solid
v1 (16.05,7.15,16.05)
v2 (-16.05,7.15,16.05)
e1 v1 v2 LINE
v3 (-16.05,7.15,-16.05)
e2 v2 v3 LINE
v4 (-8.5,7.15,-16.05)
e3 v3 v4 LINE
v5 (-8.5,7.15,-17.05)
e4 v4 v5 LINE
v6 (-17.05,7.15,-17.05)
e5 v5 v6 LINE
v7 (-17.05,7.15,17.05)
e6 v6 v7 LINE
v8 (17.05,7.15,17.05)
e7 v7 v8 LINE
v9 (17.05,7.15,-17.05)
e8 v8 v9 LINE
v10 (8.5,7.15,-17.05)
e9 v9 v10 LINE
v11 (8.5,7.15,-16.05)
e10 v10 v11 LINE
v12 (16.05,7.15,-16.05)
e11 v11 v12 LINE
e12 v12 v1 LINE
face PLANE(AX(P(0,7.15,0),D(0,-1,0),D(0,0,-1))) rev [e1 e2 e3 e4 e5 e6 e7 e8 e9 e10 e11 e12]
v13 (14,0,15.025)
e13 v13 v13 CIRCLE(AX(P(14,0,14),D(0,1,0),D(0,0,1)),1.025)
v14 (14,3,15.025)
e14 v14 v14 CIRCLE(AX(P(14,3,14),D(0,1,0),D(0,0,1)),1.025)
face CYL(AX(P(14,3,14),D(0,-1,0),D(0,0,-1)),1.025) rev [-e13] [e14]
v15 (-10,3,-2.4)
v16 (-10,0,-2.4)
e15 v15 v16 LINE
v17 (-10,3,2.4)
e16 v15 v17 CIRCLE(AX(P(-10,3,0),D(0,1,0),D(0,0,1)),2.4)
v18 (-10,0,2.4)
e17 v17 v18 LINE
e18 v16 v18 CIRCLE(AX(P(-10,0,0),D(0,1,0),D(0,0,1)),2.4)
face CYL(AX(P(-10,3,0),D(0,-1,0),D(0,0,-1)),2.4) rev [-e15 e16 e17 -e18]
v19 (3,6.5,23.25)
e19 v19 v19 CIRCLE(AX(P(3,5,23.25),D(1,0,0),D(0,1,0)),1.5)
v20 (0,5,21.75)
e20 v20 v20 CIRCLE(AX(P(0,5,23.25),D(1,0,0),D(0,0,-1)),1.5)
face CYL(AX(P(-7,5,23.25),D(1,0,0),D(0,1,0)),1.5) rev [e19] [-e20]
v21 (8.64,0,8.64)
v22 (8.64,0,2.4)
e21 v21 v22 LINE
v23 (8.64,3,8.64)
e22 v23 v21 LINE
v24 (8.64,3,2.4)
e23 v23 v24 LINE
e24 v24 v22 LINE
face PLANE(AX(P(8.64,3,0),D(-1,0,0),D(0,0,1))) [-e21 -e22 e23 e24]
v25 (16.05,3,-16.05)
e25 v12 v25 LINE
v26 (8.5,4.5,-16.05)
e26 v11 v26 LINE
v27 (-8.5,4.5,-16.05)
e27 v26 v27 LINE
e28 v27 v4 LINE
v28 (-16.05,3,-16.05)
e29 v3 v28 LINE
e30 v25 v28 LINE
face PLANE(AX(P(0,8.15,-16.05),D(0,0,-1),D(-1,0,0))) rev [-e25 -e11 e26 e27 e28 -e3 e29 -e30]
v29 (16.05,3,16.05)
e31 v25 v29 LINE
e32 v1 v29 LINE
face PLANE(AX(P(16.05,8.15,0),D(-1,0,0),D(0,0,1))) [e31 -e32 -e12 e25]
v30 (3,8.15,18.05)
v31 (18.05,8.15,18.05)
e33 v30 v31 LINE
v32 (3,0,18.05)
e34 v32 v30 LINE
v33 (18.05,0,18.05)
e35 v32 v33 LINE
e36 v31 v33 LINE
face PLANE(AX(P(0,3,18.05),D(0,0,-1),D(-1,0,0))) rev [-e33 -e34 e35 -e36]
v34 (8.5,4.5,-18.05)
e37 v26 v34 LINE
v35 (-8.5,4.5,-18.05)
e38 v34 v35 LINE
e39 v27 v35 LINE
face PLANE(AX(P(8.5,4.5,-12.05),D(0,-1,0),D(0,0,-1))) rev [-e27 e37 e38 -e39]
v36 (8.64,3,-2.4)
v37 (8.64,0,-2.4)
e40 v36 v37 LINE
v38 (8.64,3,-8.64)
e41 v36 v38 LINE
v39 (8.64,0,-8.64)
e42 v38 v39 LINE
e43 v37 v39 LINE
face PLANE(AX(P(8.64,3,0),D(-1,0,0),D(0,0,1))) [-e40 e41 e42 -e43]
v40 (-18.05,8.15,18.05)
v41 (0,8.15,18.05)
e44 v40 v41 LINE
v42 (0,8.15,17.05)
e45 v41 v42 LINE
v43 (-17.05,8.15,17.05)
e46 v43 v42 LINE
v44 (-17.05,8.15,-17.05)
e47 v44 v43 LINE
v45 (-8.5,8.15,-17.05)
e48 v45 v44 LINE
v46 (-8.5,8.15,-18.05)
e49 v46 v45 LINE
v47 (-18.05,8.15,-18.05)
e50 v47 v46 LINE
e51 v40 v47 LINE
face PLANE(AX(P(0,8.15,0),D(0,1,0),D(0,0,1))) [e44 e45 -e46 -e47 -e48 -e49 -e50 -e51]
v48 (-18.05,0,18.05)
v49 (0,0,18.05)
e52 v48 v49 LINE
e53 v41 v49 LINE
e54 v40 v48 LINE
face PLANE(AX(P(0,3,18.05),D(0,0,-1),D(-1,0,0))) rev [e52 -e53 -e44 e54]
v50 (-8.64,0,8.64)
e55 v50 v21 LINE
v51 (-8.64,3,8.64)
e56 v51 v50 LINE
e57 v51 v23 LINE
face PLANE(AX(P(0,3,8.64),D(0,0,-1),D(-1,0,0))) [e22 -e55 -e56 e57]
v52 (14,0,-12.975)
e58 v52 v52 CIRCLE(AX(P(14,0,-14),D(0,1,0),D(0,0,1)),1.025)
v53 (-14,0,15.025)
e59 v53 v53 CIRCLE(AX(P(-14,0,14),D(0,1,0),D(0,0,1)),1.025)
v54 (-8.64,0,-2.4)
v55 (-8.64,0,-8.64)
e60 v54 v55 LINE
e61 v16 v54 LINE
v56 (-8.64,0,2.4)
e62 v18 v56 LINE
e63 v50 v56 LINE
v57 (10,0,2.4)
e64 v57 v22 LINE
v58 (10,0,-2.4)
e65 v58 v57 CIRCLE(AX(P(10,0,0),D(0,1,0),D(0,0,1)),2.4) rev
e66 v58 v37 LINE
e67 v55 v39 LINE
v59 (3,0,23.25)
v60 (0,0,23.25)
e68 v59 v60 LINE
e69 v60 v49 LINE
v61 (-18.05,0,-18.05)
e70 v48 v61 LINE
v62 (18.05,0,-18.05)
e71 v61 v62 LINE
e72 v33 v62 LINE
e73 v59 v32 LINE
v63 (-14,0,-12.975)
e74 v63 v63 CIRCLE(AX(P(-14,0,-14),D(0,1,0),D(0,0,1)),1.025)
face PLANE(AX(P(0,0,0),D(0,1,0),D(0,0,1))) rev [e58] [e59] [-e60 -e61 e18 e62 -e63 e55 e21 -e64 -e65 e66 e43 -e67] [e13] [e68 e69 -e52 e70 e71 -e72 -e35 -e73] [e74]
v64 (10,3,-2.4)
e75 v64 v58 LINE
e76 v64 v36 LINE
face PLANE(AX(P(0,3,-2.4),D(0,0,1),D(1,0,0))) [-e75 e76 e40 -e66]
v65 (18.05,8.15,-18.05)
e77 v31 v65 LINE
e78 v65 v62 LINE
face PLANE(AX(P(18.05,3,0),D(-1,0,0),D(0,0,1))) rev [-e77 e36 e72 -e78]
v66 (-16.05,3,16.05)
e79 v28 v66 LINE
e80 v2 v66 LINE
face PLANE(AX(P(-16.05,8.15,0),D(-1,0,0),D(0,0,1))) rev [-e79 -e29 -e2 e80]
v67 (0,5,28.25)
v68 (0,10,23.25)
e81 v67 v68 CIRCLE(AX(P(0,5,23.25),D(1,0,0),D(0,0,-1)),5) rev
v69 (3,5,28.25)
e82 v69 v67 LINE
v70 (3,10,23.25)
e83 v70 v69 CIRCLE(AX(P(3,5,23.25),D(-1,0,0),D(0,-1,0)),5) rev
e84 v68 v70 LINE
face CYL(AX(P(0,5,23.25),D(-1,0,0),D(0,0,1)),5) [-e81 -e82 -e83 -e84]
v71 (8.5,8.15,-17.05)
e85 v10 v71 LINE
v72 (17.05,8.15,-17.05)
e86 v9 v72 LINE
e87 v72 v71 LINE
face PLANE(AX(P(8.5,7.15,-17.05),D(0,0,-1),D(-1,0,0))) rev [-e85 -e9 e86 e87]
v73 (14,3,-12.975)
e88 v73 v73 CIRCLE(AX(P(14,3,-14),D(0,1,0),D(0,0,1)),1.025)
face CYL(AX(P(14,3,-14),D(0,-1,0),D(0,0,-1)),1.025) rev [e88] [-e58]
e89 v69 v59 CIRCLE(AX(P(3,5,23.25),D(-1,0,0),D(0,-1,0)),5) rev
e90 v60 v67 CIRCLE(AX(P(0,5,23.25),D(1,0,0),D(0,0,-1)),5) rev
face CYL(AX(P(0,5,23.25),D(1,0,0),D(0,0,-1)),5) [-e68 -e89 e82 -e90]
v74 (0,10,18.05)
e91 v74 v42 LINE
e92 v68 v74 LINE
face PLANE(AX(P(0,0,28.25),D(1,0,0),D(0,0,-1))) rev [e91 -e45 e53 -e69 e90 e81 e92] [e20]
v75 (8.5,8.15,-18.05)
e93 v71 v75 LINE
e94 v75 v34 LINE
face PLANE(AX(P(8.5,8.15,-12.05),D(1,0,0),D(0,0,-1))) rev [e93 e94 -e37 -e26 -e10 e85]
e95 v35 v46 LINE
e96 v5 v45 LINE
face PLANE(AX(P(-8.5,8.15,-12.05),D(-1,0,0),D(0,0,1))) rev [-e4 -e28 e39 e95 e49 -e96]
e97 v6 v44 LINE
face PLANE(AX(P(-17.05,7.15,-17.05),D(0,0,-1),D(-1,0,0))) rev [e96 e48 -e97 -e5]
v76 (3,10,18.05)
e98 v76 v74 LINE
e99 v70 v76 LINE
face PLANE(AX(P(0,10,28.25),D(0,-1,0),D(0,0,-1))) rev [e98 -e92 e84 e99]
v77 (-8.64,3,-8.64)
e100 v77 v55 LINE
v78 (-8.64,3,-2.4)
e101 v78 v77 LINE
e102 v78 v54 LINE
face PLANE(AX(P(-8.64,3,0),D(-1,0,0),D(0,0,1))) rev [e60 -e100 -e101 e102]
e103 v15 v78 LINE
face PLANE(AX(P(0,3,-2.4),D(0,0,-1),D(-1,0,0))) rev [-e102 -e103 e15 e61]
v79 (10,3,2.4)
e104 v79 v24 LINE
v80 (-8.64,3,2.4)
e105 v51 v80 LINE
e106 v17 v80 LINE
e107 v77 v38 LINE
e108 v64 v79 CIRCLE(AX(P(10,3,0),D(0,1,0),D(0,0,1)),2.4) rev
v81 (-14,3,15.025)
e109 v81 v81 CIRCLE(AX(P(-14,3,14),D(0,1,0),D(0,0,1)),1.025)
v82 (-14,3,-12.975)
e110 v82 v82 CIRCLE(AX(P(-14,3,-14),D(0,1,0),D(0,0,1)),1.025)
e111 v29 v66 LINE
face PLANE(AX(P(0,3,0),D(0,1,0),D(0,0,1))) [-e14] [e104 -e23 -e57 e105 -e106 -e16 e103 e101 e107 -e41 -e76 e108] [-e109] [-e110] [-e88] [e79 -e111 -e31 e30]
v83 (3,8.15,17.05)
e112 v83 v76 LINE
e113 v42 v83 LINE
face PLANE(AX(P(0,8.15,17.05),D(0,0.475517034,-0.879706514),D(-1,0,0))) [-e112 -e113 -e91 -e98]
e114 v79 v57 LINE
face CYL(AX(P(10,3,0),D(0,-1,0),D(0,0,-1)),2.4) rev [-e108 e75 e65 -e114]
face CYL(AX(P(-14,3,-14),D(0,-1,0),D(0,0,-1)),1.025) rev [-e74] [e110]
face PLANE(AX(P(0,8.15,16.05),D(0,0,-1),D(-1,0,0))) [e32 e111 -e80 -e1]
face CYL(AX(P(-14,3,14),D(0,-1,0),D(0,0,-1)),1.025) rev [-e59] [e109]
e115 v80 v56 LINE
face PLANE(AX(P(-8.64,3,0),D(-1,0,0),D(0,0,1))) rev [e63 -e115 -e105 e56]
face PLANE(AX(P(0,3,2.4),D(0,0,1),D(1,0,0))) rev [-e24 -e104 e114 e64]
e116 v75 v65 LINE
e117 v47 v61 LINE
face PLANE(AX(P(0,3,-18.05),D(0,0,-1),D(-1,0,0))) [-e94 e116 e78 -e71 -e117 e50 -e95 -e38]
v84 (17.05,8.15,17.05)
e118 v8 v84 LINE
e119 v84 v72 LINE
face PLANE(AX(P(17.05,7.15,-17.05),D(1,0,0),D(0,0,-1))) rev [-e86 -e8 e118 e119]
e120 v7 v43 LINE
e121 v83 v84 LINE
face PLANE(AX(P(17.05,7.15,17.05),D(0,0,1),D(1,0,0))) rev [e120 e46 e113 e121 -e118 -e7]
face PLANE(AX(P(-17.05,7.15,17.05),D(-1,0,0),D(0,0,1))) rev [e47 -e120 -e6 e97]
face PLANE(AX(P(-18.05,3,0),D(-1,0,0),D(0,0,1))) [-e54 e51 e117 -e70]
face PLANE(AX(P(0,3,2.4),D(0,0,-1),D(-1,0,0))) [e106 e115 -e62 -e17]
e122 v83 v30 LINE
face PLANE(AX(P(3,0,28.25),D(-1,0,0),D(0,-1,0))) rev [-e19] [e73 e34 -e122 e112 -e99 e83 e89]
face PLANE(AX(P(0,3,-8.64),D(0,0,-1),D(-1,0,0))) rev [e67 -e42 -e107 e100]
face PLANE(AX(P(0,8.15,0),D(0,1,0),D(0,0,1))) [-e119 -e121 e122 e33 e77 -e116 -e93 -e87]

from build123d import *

# Parameters (mm, degrees)
SKETCH1_W           = 36.1
SKETCH1_H           = 36.1
SKETCH1_R           = 1.025
BOSS_EXTRUDE1_DEPTH = 3
SKETCH1_3_W         = 36.1
SKETCH1_3_H         = 36.1
SKETCH1_3_W_2       = 32.1
SKETCH1_3_H_2       = 32.1
BOSS_EXTRUDE2_DEPTH = 8.15
SKETCH2_W           = 17
SKETCH2_H           = 3.65
CUT_EXTRUDE1_DEPTH  = 6
CUT_EXTRUDE2_DEPTH  = 1
SKETCH6_W           = 3
SKETCH6_H           = 10
BOSS_EXTRUDE3_DEPTH = 10.2
FILLET1_R           = 5
SKETCH7_R           = 1.5
CUT_EXTRUDE3_DEPTH  = 10
CHAMFER1_SIZE2      = 1
CHAMFER1_SIZE       = 1.85


with BuildPart() as part:
    # Sketch1 → Boss-Extrude1 (new body)
    with BuildSketch(Plane(origin=(0, 0, 0), x_dir=(1, 0, 0), z_dir=(0, 1, 0))):
        Rectangle(SKETCH1_W, SKETCH1_H)
        with Locations(Location((-14, 14, 0), (0, 0, 270))):
            Circle(SKETCH1_R, mode=Mode.SUBTRACT)
        with Locations(Location((14, 14, 0), (0, 0, 270))):
            Circle(SKETCH1_R, mode=Mode.SUBTRACT)
        with Locations(Location((14, -14, 0), (0, 0, 270))):
            Circle(SKETCH1_R, mode=Mode.SUBTRACT)
        with Locations(Location((-14, -14, 0), (0, 0, 270))):
            Circle(SKETCH1_R, mode=Mode.SUBTRACT)
        with BuildLine():
            Line((-8.64, 2.4), (-8.64, 8.64))
            Line((-8.64, 8.64), (8.64, 8.64))
            Line((8.64, 8.64), (8.64, 2.4))
            Line((8.64, 2.4), (10, 2.4))
            ThreePointArc((10, 2.4), (12.4, 0), (10, -2.4))
            Line((10, -2.4), (8.64, -2.4))
            Line((8.64, -2.4), (8.64, -8.64))
            Line((8.64, -8.64), (-8.64, -8.64))
            Line((-8.64, -8.64), (-8.64, -2.4))
            Line((-8.64, -2.4), (-10, -2.4))
            ThreePointArc((-10, -2.4), (-12.4, 0), (-10, 2.4))
            Line((-10, 2.4), (-8.64, 2.4))
        make_face(mode=Mode.SUBTRACT)
    extrude(amount=BOSS_EXTRUDE1_DEPTH)

    # Sketch1<3> → Boss-Extrude2 (add)
    with BuildSketch(Plane(origin=(0, 0, 0), x_dir=(1, 0, 0), z_dir=(0, 1, 0))):
        Rectangle(SKETCH1_3_W, SKETCH1_3_H)
        Rectangle(SKETCH1_3_W_2, SKETCH1_3_H_2, mode=Mode.SUBTRACT)
    extrude(amount=BOSS_EXTRUDE2_DEPTH)

    # Sketch2 → Cut-Extrude1 (cut)
    with BuildSketch(Plane(origin=(0, 0, -18.05), x_dir=(-1, 0, 0), z_dir=(0, 0, -1))):
        with Locations((0, 6.325)):
            Rectangle(SKETCH2_W, SKETCH2_H)
    extrude(amount=-CUT_EXTRUDE1_DEPTH, mode=Mode.SUBTRACT)

    # Sketch4 → Cut-Extrude2 (cut)
    with BuildSketch(Plane(origin=(0, 8.15, 0), x_dir=(1, 0, 0), z_dir=(0, 1, 0))):
        Polygon((17.05, -17.05), (-17.05, -17.05), (-17.05, 17.05), (-8.5, 17.05), (-8.5, 16.05), (-16.05, 16.05), (-16.05, -16.05), (16.05, -16.05), (16.05, 16.05), (8.5, 16.05), (8.5, 17.05), (17.05, 17.05), align=None)
    extrude(amount=-CUT_EXTRUDE2_DEPTH, mode=Mode.SUBTRACT)

    # Sketch6 → Boss-Extrude3 (add)
    with BuildSketch(Plane.XY.offset(18.05)):
        with Locations((1.5, 5)):
            Rectangle(SKETCH6_W, SKETCH6_H)
    extrude(amount=BOSS_EXTRUDE3_DEPTH)

    # Fillet1
    fillet1_edges = [part.edges().sort_by_distance(p)[0] for p in [
        (1.5, 0, 28.25),
        (1.5, 10, 28.25),
    ]]
    fillet(fillet1_edges, radius=FILLET1_R - 0.0001)  # a hair under: the kernel refuses the full size

    # Sketch7 → Cut-Extrude3 (cut)
    with BuildSketch(Plane(origin=(3, 0, 0), x_dir=(0, 0, -1), z_dir=(1, 0, 0))):
        with Locations(Location((-23.25, 5, 0), (0, 0, 90))):
            Circle(SKETCH7_R)
    extrude(amount=-CUT_EXTRUDE3_DEPTH, mode=Mode.SUBTRACT)

    # Chamfer1
    chamfer1_edges = [part.edges().sort_by_distance(p)[0] for p in [
        (1.5, 8.15, 18.05),
    ]]
    chamfer1_side = [part.faces().sort_by_distance(p)[0] for p in [
        (1.5, 8.17, 18.05),
    ]]
    chamfer(chamfer1_edges, length=CHAMFER1_SIZE - 0.0001, length2=CHAMFER1_SIZE2 - 0.0001, reference=chamfer1_side[0])  # a hair under: the kernel refuses the full size


solid = part.part
